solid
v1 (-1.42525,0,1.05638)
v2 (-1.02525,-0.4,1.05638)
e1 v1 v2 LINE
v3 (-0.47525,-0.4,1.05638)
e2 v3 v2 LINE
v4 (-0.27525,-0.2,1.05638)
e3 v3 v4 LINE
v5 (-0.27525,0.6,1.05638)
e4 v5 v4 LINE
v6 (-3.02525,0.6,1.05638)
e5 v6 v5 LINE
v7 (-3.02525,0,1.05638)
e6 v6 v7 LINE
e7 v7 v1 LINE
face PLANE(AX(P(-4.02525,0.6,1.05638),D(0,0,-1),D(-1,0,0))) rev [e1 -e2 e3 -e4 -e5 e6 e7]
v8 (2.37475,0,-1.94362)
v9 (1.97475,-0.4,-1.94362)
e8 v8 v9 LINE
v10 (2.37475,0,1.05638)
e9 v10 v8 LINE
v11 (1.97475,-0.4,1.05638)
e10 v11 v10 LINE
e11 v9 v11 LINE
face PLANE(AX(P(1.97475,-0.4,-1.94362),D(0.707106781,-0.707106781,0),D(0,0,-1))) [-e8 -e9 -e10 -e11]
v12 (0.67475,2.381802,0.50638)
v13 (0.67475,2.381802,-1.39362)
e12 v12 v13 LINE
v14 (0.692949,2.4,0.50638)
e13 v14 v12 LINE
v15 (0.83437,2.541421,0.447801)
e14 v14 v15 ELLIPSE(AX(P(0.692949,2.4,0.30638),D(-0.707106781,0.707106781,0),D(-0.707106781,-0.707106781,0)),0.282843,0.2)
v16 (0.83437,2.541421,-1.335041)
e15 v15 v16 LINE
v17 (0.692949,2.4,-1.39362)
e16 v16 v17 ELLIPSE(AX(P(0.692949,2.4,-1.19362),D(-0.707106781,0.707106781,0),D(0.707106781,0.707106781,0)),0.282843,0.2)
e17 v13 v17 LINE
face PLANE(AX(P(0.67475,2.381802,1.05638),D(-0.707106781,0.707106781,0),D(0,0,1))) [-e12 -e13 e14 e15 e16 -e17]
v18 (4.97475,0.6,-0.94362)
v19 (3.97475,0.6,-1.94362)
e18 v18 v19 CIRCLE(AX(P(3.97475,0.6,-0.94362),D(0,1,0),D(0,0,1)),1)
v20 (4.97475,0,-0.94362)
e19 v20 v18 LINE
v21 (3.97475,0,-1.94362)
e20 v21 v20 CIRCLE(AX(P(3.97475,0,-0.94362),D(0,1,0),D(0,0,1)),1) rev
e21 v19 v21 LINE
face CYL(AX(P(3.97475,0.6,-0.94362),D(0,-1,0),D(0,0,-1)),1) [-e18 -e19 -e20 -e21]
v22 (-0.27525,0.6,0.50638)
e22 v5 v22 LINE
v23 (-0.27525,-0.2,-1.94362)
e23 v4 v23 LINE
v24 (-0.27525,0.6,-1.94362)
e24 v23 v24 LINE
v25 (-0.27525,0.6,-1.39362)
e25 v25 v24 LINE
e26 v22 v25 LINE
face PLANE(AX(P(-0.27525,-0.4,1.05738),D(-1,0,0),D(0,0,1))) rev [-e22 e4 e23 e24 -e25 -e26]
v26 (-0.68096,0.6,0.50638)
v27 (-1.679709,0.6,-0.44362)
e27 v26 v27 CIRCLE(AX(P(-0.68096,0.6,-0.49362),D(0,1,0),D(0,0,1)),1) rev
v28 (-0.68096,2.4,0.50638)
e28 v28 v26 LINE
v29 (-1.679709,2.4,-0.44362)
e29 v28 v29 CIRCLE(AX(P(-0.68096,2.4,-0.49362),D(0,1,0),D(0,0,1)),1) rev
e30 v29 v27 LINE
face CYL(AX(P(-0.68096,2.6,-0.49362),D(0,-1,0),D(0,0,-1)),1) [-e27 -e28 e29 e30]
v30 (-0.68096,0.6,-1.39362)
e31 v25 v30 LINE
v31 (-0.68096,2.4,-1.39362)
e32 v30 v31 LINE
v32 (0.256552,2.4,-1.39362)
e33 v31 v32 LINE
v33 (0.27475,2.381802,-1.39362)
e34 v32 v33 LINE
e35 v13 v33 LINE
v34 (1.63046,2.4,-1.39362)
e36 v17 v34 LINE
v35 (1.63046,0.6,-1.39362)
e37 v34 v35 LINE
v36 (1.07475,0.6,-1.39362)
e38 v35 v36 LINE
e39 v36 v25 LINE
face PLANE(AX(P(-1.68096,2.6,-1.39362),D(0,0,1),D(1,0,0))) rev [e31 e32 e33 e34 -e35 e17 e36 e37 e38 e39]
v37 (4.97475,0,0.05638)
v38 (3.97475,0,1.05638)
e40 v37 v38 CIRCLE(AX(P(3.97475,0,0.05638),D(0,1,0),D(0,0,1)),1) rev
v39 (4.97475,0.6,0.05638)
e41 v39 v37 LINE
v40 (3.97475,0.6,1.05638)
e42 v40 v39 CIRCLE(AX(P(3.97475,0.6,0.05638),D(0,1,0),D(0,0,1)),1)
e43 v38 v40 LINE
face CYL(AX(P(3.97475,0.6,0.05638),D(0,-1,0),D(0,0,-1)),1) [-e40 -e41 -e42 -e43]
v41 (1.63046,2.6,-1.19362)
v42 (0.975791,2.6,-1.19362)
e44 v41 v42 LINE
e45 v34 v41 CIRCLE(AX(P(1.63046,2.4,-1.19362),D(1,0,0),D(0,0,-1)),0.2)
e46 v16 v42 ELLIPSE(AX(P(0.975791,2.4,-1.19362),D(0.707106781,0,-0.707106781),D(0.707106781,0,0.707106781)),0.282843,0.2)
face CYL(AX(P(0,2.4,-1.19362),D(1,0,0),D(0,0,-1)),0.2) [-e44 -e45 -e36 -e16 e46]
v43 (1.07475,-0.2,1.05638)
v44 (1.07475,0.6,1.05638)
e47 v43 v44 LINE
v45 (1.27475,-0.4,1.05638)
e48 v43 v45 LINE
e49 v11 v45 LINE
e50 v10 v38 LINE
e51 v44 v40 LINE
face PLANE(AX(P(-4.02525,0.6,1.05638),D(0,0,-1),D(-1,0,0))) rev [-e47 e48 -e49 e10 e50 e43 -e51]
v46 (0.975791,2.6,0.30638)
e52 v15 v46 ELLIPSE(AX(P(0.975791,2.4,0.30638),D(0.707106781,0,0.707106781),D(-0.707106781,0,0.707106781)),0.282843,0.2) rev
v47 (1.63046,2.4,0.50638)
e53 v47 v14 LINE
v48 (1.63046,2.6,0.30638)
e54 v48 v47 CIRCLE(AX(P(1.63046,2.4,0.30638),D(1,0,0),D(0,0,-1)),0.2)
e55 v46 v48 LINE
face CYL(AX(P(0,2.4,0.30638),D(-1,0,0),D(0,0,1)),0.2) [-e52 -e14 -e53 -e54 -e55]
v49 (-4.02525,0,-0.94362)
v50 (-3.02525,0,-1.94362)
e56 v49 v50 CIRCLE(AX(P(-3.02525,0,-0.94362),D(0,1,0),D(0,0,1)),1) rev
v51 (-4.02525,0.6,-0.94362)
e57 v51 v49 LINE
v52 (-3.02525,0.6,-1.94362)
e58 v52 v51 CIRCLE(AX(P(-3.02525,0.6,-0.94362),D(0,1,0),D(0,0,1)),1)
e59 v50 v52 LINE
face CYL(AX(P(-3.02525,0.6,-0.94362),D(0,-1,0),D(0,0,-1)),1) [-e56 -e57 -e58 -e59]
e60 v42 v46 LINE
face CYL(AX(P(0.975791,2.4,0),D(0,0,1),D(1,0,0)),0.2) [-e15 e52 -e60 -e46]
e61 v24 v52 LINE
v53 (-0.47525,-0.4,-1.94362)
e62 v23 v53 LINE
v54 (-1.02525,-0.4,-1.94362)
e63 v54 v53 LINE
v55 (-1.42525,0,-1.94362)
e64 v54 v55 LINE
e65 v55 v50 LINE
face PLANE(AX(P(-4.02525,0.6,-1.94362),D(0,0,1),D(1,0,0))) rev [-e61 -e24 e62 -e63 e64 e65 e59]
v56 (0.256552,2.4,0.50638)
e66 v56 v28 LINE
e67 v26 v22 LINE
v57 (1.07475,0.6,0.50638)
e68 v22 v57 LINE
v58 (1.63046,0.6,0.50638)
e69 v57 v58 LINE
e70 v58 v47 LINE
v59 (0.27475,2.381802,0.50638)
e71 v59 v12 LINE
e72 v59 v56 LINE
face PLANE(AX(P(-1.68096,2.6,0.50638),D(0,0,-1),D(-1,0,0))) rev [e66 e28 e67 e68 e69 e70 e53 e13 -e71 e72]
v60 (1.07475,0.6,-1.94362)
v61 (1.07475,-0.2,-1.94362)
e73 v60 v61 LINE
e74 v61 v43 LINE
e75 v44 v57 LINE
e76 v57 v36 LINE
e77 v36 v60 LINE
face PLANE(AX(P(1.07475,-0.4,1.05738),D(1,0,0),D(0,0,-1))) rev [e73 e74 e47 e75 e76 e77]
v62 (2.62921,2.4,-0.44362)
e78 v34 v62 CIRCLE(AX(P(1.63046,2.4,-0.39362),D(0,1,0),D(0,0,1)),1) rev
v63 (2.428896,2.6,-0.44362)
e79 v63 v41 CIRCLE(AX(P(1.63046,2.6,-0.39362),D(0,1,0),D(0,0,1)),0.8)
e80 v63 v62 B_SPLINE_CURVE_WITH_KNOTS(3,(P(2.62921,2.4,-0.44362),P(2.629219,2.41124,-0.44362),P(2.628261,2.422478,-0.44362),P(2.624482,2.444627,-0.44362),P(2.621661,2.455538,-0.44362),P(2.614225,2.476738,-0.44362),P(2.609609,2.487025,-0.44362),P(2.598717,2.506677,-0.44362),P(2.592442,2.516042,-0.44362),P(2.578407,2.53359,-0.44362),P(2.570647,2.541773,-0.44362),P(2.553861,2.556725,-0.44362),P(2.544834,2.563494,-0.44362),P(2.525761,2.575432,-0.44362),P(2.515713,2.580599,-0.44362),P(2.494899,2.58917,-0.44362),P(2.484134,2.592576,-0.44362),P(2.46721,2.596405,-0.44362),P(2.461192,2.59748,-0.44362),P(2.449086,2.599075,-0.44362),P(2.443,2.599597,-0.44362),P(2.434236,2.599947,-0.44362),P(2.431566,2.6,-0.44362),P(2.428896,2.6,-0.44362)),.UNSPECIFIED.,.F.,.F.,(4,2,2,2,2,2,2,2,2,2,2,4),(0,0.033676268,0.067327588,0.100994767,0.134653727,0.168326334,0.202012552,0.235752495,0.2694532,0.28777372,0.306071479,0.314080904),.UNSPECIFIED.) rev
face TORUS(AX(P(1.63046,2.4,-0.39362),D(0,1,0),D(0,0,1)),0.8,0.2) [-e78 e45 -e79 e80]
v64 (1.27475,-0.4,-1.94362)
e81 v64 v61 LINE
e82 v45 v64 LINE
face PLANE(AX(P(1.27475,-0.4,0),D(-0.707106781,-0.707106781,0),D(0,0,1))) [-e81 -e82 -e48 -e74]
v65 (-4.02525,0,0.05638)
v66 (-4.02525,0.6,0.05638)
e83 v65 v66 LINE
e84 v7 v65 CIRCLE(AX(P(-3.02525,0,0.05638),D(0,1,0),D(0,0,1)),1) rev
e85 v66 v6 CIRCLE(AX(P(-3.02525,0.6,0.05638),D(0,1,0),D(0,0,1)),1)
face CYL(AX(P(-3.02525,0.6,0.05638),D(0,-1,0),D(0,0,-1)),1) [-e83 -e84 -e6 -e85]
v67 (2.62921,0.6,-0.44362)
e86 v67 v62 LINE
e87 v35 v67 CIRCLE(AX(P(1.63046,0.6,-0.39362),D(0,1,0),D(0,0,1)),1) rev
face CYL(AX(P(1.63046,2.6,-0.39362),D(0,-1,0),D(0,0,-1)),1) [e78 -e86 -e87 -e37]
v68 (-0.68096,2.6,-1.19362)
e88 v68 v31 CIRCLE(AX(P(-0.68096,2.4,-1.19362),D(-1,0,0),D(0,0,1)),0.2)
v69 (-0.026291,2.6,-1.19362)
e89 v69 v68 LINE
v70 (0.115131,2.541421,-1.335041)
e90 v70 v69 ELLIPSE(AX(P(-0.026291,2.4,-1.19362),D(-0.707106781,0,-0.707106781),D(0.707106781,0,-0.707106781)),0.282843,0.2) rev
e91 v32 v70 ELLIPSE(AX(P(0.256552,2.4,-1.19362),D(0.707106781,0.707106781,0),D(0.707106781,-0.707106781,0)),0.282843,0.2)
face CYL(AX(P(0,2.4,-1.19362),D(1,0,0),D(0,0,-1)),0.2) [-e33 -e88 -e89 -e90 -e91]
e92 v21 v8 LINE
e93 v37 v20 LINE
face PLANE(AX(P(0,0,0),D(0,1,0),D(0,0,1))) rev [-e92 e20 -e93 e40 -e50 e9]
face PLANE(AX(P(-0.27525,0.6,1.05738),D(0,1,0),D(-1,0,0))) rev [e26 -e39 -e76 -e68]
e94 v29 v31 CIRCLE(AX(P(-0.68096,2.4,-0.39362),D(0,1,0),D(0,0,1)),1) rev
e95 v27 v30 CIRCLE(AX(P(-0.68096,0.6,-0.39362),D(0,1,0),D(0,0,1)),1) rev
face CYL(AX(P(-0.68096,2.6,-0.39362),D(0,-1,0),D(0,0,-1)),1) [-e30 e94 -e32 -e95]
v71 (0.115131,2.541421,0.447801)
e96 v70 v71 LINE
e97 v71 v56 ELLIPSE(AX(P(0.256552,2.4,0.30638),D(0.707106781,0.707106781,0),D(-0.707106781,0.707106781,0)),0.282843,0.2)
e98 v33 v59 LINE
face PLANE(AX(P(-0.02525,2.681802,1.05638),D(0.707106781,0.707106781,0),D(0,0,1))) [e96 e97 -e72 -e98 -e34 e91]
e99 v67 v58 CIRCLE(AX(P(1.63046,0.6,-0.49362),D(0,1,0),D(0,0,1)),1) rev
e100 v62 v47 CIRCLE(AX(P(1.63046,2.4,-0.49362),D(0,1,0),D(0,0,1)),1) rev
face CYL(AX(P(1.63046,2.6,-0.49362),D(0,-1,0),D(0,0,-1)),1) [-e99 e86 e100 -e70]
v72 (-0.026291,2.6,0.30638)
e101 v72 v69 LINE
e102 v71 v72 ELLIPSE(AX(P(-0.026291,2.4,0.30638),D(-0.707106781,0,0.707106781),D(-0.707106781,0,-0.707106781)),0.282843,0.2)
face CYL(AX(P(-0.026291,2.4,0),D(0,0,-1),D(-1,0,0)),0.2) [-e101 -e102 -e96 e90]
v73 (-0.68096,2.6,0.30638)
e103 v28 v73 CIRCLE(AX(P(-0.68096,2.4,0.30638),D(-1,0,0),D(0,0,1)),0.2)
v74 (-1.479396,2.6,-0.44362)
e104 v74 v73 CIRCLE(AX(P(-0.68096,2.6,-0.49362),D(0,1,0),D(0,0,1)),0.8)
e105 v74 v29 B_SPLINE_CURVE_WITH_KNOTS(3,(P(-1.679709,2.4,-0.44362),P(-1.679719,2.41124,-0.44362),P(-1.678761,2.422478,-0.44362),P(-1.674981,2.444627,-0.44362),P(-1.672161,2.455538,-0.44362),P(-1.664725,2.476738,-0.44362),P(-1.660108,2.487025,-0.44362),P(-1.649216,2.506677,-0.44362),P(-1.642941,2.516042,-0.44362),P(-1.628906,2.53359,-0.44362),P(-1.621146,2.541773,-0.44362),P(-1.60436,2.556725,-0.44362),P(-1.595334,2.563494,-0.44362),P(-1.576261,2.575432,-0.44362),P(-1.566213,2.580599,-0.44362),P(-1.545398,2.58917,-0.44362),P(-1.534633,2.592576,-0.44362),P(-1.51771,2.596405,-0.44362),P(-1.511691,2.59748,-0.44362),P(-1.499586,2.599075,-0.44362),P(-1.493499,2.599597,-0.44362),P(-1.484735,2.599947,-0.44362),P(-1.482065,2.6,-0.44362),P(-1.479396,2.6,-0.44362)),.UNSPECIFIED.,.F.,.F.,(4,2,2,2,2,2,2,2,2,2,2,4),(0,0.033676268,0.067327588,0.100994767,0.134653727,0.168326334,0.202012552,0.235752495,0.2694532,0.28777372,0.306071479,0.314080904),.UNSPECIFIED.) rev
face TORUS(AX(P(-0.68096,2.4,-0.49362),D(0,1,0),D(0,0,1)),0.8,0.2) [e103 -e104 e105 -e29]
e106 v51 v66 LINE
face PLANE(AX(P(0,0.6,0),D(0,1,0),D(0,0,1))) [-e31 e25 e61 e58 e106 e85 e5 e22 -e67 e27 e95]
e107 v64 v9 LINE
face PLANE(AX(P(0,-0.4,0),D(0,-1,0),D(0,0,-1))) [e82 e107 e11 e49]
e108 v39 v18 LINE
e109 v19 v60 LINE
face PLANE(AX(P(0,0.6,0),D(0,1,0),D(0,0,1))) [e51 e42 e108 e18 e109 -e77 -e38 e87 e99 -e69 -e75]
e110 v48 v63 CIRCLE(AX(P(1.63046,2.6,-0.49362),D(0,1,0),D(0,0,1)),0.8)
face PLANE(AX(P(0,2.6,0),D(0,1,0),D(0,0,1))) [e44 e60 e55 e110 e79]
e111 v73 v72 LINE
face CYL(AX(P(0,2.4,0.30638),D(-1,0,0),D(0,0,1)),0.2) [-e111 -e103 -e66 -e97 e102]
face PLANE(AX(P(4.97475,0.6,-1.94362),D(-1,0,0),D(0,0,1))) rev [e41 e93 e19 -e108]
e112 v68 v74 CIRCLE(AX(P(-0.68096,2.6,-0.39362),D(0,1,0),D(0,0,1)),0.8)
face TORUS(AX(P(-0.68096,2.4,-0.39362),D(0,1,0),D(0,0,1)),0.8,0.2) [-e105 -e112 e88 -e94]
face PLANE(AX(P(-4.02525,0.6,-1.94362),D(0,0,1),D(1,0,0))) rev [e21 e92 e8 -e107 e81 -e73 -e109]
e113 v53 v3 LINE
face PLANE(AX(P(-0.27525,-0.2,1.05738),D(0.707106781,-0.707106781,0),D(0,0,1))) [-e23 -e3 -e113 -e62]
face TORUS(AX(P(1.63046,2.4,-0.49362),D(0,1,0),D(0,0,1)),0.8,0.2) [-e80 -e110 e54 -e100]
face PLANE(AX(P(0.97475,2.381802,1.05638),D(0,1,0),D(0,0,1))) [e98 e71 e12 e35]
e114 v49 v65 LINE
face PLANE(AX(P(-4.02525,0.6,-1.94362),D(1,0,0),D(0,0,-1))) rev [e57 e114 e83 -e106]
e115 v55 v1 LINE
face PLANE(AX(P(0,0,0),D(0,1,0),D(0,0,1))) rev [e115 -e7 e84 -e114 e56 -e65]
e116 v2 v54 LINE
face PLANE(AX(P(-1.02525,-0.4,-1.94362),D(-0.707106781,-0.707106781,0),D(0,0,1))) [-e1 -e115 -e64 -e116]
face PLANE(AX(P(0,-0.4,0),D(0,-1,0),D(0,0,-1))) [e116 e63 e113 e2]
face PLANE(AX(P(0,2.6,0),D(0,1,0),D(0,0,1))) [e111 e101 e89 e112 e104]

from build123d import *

# Parameters (mm, degrees)
SKETCH_1_W                      = 9
SKETCH_1_H                      = 3
EXTRUDE_1_DEPTH                 = 0.6
SKETCH_2_W                      = 4.311420348
SKETCH_2_H                      = 1.9
EXTRUDE_2_DEPTH                 = 2
FILLET_1_R                      = 1
SKETCH_3_W                      = 3
SKETCH_3_H                      = 3
EXTRUDE_3_DEPTH                 = 0.4
CHAMFER_1_SIZE                  = 0.4
CUT_EXTRUDE_1_REACH             = 8.365
SKETCH_5_W                      = 1.35
SKETCH_5_H                      = 1
CHAMFER_2_SIZE                  = 0.2
CUT_EXTRUDE_2_REACH             = 8.125
SKETCH_7_W                      = 1
SKETCH_7_H                      = 0.436396564
CUT_EXTRUDE_2_DIRECTION_2_DEPTH = 7.124593071
CHAMFER_3_SIZE                  = 0.3
FILLET_2_R                      = 0.2


# Some blends are built 0.0001 mm under size
with BuildPart() as part:
    # 草图1 → 凸台-拉伸1 (new body)
    with BuildSketch(Plane(origin=(0, 0, 0), x_dir=(1, 0, 0), z_dir=(0, 1, 0))):
        with Locations((0.474750274, 0.443619988)):
            Rectangle(SKETCH_1_W, SKETCH_1_H)
    extrude(amount=EXTRUDE_1_DEPTH)

    # 草图2 → 凸台-拉伸2 (add)
    with BuildSketch(Plane(origin=(0, 0.6, 0), x_dir=(1, 0, 0), z_dir=(0, 1, 0))):
        with Locations((0.474750274, 0.443619988)):
            Rectangle(SKETCH_2_W, SKETCH_2_H)
    extrude(amount=EXTRUDE_2_DEPTH)

    # 圆角1
    # the kernel refuses this fillet: 1 mm, written as the material it takes off along each edge
    with BuildSketch(Plane(origin=(-4.025249726, -2.5, 1.056380012), x_dir=(0, 0, -1), z_dir=(0, 1, 0)), Plane(origin=(-4.025249726, -2.5, -1.943619988), x_dir=(1, 0, 0), z_dir=(0, 1, 0))) as fillet_1_piece_1:
        with BuildLine():
            CenterArc((FILLET_1_R, -FILLET_1_R), FILLET_1_R, 90, 90)
            Line((0, -FILLET_1_R), (0, 0))
            Line((0, 0), (FILLET_1_R, 0))
        make_face()
    extrude(amount=5.6, mode=Mode.SUBTRACT)
    with BuildSketch(Plane(origin=(-1.6809599, 0.6, 0.506380012), x_dir=(1, 0, 0), z_dir=(0, 1, 0)), Plane(origin=(2.630460448, 0.6, 0.506380012), x_dir=(0, 0, -1), z_dir=(0, 1, 0)), Plane(origin=(2.630460448, 0.6, -1.393619988), x_dir=(-1, 0, 0), z_dir=(0, 1, 0))) as fillet_1_piece_2:
        with BuildLine():
            CenterArc((FILLET_1_R, FILLET_1_R), FILLET_1_R, 180, 90)
            Line((0, FILLET_1_R), (0, 0))
            Line((0, 0), (FILLET_1_R, 0))
        make_face()
    extrude(amount=4.5, mode=Mode.SUBTRACT)
    with BuildSketch(Plane(origin=(4.974750274, -2.5, 1.056380012), x_dir=(0, 0, -1), z_dir=(0, 1, 0)), Plane(origin=(4.974750274, -2.5, -1.943619988), x_dir=(-1, 0, 0), z_dir=(0, 1, 0))) as fillet_1_piece_3:
        with BuildLine():
            CenterArc((FILLET_1_R, FILLET_1_R), FILLET_1_R, 180, 90)
            Line((0, FILLET_1_R), (0, 0))
            Line((0, 0), (FILLET_1_R, 0))
        make_face()
    extrude(amount=5.6, mode=Mode.SUBTRACT)
    with BuildSketch(Plane(origin=(-1.6809599, 0.6, -1.393619988), x_dir=(1, 0, 0), z_dir=(0, 1, 0))) as fillet_1_piece_4:
        with BuildLine():
            CenterArc((FILLET_1_R, -FILLET_1_R), FILLET_1_R, 90, 90)
            Line((0, -FILLET_1_R), (0, 0))
            Line((0, 0), (FILLET_1_R, 0))
        make_face()
    extrude(amount=4.5, mode=Mode.SUBTRACT)

    # 草图3 → 凸台-拉伸3 (add)
    with BuildSketch(Plane.XZ):
        with Locations((0.474750274, -0.443619988)):
            Rectangle(SKETCH_3_W, SKETCH_3_H)
    extrude(amount=EXTRUDE_3_DEPTH)

    # 倒角1
    chamfer_1_edges = [part.edges().sort_by_distance(p)[0] for p in [
        (1.974750274, 0, -0.443619988),
        (-1.025249726, 0, -0.443619988),
    ]]
    chamfer(chamfer_1_edges, length=CHAMFER_1_SIZE - 0.0001)  # a hair under: the kernel refuses the full size

    # 草图5 → 切除-拉伸1 (cut, up to next)
    with BuildSketch(Plane(origin=(0, 0, -1.943619988), x_dir=(-1, 0, 0), z_dir=(0, 0, -1)), mode=Mode.PRIVATE) as cut_extrude_1_sk1:
        with Locations((-0.399750274, 0.1)):
            Rectangle(SKETCH_5_W, SKETCH_5_H)
    cut_extrude_1_tool1 = extrude(cut_extrude_1_sk1.sketch, amount=-CUT_EXTRUDE_1_REACH, mode=Mode.PRIVATE) & part.part
    add(cut_extrude_1_tool1.solids().sort_by_distance((0.39975, 0.1, -1.94362))[0], mode=Mode.SUBTRACT)

    # 倒角2
    chamfer_2_edges = [part.edges().sort_by_distance(p)[0] for p in [
        (-0.275249726, -0.4, -0.443619988),
        (1.074750274, -0.4, -0.443619988),
    ]]
    chamfer(chamfer_2_edges, length=CHAMFER_2_SIZE)

    # 草图7 → 切除-拉伸2 (cut, up to next)
    with BuildSketch(Plane.XY.offset(0.506380012), mode=Mode.PRIVATE) as cut_extrude_2_sk1:
        with Locations((0.474750274, 2.6)):
            Rectangle(SKETCH_7_W, SKETCH_7_H)
    cut_extrude_2_tool1 = extrude(cut_extrude_2_sk1.sketch, amount=-CUT_EXTRUDE_2_REACH, mode=Mode.PRIVATE) & part.part
    add(cut_extrude_2_tool1.solids().sort_by_distance((0.47475, 2.6, 0.50638))[0], mode=Mode.SUBTRACT)

    # 草图7 → 切除-拉伸2 direction 2 (cut)
    with BuildSketch(Plane.XY.offset(0.506380012)):
        with Locations((0.474750274, 2.6)):
            Rectangle(SKETCH_7_W, SKETCH_7_H)
    extrude(amount=CUT_EXTRUDE_2_DIRECTION_2_DEPTH, mode=Mode.SUBTRACT)

    # 倒角3
    # the kernel refuses this chamfer: 0.3 mm, written as the material it adds along each edge
    with BuildSketch(Plane(origin=(0.974750274, 2.381801718, 0.506380012), x_dir=(-0.9996219169112968, -0.027495876610585914, 0), z_dir=(0, 0, -1))) as chamfer_3_piece_1_section:
        Polygon((CHAMFER_3_SIZE * 0.999621916911, CHAMFER_3_SIZE * 0.0274958766106), (-CHAMFER_3_SIZE * 0.0274958766106, CHAMFER_3_SIZE * 0.999621916911), (0, 0), align=None)
    chamfer_3_piece_1 = extrude(amount=1.9, mode=Mode.PRIVATE)
    chamfer_3_piece_1 = split(chamfer_3_piece_1, bisect_by=Plane(origin=(0.868236274, 2.6, -0.443619988), z_dir=(0, -1, 0)), keep=Keep.TOP, mode=Mode.PRIVATE)
    add(chamfer_3_piece_1)
    with BuildSketch(Plane(origin=(-0.025249726, 2.381801718, 0.506380012), x_dir=(-0.027495876610586414, 0.9996219169112968, 0), z_dir=(0, 0, -1))) as chamfer_3_piece_2_section:
        Polygon((CHAMFER_3_SIZE * 0.999621916911, CHAMFER_3_SIZE * 0.0274958766106), (-CHAMFER_3_SIZE * 0.0274958766106, CHAMFER_3_SIZE * 0.999621916911), (0, 0), align=None)
    chamfer_3_piece_2 = extrude(amount=1.9, mode=Mode.PRIVATE)
    chamfer_3_piece_2 = split(chamfer_3_piece_2, bisect_by=Plane(origin=(0.081264274, 2.6, -0.443619988), z_dir=(0, -1, 0)), keep=Keep.TOP, mode=Mode.PRIVATE)
    add(chamfer_3_piece_2)

    # 圆角2
    # the kernel refuses this fillet: 0.2 mm, written as the material it takes off along each edge
    with BuildSketch(Plane(origin=(1.630460448, 2.6, 0.506380012), x_dir=(0, 0, -1), z_dir=(-1, 0, 0)), Plane(origin=(-0.6809599, 2.6, -1.393619988), x_dir=(0, 0, 1), z_dir=(1, 0, 0)), Plane(origin=(0.556551992, 2.6, 0.506380012), x_dir=(0, 0, -1), z_dir=(-1, 0, 0))) as fillet_2_piece_1:
        with BuildLine():
            CenterArc((FILLET_2_R, FILLET_2_R), FILLET_2_R, 180, 90)
            Line((0, FILLET_2_R), (0, 0))
            Line((0, 0), (FILLET_2_R, 0))
        make_face()
    extrude(amount=1.237511893, mode=Mode.SUBTRACT)
    with BuildSketch(Plane(origin=(0.892948555, 2.6, 0.713486793), x_dir=(1, 0, 0), z_dir=(0, 0, -1))) as fillet_2_piece_2:
        with BuildLine():
            CenterArc((FILLET_2_R * 0.414213562373, FILLET_2_R), FILLET_2_R, 225, 45)
            Line((-FILLET_2_R * 0.292893218814, FILLET_2_R * 0.292893218814), (0, 0))
            Line((0, 0), (FILLET_2_R * 0.414213562373, 0))
        make_face()
    extrude(amount=2.314213562, mode=Mode.SUBTRACT)
    with BuildSketch(Plane(origin=(0.056551992, 2.6, -1.60072677), x_dir=(0.7071067811868288, -0.7071067811862661, 0), z_dir=(0, 0, 1))) as fillet_2_piece_3:
        with BuildLine():
            CenterArc((FILLET_2_R * 0.414213562373, -FILLET_2_R), FILLET_2_R, 90, 45)
            Line((-FILLET_2_R * 0.292893218813, -FILLET_2_R * 0.292893218813), (0, 0))
            Line((0, 0), (FILLET_2_R * 0.414213562373, 0))
        make_face()
    extrude(amount=2.314213562, mode=Mode.SUBTRACT)
    with BuildSketch(Plane(origin=(1.630460448, 2.6, -1.393619988), x_dir=(0, 0, 1), z_dir=(-1, 0, 0))) as fillet_2_piece_4:
        with BuildLine():
            CenterArc((FILLET_2_R, -FILLET_2_R), FILLET_2_R, 90, 90)
            Line((0, -FILLET_2_R), (0, 0))
            Line((0, 0), (FILLET_2_R, 0))
        make_face()
    extrude(amount=1.237511893, mode=Mode.SUBTRACT)
    with BuildSketch(Plane(origin=(1.630460448, 2.6, -0.393619988), x_dir=(0, 0, -1), z_dir=(-1, 0, 0))) as fillet_2_piece_5:
        with BuildLine():
            CenterArc((1 - FILLET_2_R, FILLET_2_R), FILLET_2_R, 270, 90)
            Line((1, FILLET_2_R), (1, 0))
            Line((1, 0), (1 - FILLET_2_R, 0))
        make_face()
    revolve(axis=Axis((1.630460448, 2.6, -0.393619988), (0, -1, 0)), revolution_arc=115.792692411, mode=Mode.SUBTRACT)
    with BuildSketch(Plane(origin=(1.630460448, 2.6, -0.493619988), x_dir=(0.9003742740999041, 0, -0.4351162678400692), z_dir=(-0.4351162678400692, 0, -0.9003742740999041))) as fillet_2_piece_6:
        with BuildLine():
            CenterArc((1 - FILLET_2_R, FILLET_2_R), FILLET_2_R, 270, 90)
            Line((1 - FILLET_2_R, 0), (1, 0))
            Line((1, 0), (1, FILLET_2_R))
        make_face()
    revolve(axis=Axis((1.630460448, 2.6, -0.493619988), (0, -1, 0)), revolution_arc=115.792692411, mode=Mode.SUBTRACT)
    with BuildSketch(Plane(origin=(-0.6809599, 2.6, -0.393619988), x_dir=(-0.9003742740999052, 0, 0.43511626784006674), z_dir=(0.43511626784006674, 0, 0.9003742740999052))) as fillet_2_piece_7:
        with BuildLine():
            CenterArc((1 - FILLET_2_R, FILLET_2_R), FILLET_2_R, 270, 90)
            Line((1, FILLET_2_R), (1, 0))
            Line((1, 0), (1 - FILLET_2_R, 0))
        make_face()
    revolve(axis=Axis((-0.6809599, 2.6, -0.393619988), (0, -1, 0)), revolution_arc=115.792692411, mode=Mode.SUBTRACT)
    with BuildSketch(Plane(origin=(-0.6809599, 2.6, -0.493619988), x_dir=(0, 0, 1), z_dir=(1, 0, 0))) as fillet_2_piece_8:
        with BuildLine():
            CenterArc((1 - FILLET_2_R, FILLET_2_R), FILLET_2_R, 270, 90)
            Line((1, FILLET_2_R), (1, 0))
            Line((1, 0), (1 - FILLET_2_R, 0))
        make_face()
    revolve(axis=Axis((-0.6809599, 2.6, -0.493619988), (0, -1, 0)), revolution_arc=115.792692411, mode=Mode.SUBTRACT)


solid = part.part
